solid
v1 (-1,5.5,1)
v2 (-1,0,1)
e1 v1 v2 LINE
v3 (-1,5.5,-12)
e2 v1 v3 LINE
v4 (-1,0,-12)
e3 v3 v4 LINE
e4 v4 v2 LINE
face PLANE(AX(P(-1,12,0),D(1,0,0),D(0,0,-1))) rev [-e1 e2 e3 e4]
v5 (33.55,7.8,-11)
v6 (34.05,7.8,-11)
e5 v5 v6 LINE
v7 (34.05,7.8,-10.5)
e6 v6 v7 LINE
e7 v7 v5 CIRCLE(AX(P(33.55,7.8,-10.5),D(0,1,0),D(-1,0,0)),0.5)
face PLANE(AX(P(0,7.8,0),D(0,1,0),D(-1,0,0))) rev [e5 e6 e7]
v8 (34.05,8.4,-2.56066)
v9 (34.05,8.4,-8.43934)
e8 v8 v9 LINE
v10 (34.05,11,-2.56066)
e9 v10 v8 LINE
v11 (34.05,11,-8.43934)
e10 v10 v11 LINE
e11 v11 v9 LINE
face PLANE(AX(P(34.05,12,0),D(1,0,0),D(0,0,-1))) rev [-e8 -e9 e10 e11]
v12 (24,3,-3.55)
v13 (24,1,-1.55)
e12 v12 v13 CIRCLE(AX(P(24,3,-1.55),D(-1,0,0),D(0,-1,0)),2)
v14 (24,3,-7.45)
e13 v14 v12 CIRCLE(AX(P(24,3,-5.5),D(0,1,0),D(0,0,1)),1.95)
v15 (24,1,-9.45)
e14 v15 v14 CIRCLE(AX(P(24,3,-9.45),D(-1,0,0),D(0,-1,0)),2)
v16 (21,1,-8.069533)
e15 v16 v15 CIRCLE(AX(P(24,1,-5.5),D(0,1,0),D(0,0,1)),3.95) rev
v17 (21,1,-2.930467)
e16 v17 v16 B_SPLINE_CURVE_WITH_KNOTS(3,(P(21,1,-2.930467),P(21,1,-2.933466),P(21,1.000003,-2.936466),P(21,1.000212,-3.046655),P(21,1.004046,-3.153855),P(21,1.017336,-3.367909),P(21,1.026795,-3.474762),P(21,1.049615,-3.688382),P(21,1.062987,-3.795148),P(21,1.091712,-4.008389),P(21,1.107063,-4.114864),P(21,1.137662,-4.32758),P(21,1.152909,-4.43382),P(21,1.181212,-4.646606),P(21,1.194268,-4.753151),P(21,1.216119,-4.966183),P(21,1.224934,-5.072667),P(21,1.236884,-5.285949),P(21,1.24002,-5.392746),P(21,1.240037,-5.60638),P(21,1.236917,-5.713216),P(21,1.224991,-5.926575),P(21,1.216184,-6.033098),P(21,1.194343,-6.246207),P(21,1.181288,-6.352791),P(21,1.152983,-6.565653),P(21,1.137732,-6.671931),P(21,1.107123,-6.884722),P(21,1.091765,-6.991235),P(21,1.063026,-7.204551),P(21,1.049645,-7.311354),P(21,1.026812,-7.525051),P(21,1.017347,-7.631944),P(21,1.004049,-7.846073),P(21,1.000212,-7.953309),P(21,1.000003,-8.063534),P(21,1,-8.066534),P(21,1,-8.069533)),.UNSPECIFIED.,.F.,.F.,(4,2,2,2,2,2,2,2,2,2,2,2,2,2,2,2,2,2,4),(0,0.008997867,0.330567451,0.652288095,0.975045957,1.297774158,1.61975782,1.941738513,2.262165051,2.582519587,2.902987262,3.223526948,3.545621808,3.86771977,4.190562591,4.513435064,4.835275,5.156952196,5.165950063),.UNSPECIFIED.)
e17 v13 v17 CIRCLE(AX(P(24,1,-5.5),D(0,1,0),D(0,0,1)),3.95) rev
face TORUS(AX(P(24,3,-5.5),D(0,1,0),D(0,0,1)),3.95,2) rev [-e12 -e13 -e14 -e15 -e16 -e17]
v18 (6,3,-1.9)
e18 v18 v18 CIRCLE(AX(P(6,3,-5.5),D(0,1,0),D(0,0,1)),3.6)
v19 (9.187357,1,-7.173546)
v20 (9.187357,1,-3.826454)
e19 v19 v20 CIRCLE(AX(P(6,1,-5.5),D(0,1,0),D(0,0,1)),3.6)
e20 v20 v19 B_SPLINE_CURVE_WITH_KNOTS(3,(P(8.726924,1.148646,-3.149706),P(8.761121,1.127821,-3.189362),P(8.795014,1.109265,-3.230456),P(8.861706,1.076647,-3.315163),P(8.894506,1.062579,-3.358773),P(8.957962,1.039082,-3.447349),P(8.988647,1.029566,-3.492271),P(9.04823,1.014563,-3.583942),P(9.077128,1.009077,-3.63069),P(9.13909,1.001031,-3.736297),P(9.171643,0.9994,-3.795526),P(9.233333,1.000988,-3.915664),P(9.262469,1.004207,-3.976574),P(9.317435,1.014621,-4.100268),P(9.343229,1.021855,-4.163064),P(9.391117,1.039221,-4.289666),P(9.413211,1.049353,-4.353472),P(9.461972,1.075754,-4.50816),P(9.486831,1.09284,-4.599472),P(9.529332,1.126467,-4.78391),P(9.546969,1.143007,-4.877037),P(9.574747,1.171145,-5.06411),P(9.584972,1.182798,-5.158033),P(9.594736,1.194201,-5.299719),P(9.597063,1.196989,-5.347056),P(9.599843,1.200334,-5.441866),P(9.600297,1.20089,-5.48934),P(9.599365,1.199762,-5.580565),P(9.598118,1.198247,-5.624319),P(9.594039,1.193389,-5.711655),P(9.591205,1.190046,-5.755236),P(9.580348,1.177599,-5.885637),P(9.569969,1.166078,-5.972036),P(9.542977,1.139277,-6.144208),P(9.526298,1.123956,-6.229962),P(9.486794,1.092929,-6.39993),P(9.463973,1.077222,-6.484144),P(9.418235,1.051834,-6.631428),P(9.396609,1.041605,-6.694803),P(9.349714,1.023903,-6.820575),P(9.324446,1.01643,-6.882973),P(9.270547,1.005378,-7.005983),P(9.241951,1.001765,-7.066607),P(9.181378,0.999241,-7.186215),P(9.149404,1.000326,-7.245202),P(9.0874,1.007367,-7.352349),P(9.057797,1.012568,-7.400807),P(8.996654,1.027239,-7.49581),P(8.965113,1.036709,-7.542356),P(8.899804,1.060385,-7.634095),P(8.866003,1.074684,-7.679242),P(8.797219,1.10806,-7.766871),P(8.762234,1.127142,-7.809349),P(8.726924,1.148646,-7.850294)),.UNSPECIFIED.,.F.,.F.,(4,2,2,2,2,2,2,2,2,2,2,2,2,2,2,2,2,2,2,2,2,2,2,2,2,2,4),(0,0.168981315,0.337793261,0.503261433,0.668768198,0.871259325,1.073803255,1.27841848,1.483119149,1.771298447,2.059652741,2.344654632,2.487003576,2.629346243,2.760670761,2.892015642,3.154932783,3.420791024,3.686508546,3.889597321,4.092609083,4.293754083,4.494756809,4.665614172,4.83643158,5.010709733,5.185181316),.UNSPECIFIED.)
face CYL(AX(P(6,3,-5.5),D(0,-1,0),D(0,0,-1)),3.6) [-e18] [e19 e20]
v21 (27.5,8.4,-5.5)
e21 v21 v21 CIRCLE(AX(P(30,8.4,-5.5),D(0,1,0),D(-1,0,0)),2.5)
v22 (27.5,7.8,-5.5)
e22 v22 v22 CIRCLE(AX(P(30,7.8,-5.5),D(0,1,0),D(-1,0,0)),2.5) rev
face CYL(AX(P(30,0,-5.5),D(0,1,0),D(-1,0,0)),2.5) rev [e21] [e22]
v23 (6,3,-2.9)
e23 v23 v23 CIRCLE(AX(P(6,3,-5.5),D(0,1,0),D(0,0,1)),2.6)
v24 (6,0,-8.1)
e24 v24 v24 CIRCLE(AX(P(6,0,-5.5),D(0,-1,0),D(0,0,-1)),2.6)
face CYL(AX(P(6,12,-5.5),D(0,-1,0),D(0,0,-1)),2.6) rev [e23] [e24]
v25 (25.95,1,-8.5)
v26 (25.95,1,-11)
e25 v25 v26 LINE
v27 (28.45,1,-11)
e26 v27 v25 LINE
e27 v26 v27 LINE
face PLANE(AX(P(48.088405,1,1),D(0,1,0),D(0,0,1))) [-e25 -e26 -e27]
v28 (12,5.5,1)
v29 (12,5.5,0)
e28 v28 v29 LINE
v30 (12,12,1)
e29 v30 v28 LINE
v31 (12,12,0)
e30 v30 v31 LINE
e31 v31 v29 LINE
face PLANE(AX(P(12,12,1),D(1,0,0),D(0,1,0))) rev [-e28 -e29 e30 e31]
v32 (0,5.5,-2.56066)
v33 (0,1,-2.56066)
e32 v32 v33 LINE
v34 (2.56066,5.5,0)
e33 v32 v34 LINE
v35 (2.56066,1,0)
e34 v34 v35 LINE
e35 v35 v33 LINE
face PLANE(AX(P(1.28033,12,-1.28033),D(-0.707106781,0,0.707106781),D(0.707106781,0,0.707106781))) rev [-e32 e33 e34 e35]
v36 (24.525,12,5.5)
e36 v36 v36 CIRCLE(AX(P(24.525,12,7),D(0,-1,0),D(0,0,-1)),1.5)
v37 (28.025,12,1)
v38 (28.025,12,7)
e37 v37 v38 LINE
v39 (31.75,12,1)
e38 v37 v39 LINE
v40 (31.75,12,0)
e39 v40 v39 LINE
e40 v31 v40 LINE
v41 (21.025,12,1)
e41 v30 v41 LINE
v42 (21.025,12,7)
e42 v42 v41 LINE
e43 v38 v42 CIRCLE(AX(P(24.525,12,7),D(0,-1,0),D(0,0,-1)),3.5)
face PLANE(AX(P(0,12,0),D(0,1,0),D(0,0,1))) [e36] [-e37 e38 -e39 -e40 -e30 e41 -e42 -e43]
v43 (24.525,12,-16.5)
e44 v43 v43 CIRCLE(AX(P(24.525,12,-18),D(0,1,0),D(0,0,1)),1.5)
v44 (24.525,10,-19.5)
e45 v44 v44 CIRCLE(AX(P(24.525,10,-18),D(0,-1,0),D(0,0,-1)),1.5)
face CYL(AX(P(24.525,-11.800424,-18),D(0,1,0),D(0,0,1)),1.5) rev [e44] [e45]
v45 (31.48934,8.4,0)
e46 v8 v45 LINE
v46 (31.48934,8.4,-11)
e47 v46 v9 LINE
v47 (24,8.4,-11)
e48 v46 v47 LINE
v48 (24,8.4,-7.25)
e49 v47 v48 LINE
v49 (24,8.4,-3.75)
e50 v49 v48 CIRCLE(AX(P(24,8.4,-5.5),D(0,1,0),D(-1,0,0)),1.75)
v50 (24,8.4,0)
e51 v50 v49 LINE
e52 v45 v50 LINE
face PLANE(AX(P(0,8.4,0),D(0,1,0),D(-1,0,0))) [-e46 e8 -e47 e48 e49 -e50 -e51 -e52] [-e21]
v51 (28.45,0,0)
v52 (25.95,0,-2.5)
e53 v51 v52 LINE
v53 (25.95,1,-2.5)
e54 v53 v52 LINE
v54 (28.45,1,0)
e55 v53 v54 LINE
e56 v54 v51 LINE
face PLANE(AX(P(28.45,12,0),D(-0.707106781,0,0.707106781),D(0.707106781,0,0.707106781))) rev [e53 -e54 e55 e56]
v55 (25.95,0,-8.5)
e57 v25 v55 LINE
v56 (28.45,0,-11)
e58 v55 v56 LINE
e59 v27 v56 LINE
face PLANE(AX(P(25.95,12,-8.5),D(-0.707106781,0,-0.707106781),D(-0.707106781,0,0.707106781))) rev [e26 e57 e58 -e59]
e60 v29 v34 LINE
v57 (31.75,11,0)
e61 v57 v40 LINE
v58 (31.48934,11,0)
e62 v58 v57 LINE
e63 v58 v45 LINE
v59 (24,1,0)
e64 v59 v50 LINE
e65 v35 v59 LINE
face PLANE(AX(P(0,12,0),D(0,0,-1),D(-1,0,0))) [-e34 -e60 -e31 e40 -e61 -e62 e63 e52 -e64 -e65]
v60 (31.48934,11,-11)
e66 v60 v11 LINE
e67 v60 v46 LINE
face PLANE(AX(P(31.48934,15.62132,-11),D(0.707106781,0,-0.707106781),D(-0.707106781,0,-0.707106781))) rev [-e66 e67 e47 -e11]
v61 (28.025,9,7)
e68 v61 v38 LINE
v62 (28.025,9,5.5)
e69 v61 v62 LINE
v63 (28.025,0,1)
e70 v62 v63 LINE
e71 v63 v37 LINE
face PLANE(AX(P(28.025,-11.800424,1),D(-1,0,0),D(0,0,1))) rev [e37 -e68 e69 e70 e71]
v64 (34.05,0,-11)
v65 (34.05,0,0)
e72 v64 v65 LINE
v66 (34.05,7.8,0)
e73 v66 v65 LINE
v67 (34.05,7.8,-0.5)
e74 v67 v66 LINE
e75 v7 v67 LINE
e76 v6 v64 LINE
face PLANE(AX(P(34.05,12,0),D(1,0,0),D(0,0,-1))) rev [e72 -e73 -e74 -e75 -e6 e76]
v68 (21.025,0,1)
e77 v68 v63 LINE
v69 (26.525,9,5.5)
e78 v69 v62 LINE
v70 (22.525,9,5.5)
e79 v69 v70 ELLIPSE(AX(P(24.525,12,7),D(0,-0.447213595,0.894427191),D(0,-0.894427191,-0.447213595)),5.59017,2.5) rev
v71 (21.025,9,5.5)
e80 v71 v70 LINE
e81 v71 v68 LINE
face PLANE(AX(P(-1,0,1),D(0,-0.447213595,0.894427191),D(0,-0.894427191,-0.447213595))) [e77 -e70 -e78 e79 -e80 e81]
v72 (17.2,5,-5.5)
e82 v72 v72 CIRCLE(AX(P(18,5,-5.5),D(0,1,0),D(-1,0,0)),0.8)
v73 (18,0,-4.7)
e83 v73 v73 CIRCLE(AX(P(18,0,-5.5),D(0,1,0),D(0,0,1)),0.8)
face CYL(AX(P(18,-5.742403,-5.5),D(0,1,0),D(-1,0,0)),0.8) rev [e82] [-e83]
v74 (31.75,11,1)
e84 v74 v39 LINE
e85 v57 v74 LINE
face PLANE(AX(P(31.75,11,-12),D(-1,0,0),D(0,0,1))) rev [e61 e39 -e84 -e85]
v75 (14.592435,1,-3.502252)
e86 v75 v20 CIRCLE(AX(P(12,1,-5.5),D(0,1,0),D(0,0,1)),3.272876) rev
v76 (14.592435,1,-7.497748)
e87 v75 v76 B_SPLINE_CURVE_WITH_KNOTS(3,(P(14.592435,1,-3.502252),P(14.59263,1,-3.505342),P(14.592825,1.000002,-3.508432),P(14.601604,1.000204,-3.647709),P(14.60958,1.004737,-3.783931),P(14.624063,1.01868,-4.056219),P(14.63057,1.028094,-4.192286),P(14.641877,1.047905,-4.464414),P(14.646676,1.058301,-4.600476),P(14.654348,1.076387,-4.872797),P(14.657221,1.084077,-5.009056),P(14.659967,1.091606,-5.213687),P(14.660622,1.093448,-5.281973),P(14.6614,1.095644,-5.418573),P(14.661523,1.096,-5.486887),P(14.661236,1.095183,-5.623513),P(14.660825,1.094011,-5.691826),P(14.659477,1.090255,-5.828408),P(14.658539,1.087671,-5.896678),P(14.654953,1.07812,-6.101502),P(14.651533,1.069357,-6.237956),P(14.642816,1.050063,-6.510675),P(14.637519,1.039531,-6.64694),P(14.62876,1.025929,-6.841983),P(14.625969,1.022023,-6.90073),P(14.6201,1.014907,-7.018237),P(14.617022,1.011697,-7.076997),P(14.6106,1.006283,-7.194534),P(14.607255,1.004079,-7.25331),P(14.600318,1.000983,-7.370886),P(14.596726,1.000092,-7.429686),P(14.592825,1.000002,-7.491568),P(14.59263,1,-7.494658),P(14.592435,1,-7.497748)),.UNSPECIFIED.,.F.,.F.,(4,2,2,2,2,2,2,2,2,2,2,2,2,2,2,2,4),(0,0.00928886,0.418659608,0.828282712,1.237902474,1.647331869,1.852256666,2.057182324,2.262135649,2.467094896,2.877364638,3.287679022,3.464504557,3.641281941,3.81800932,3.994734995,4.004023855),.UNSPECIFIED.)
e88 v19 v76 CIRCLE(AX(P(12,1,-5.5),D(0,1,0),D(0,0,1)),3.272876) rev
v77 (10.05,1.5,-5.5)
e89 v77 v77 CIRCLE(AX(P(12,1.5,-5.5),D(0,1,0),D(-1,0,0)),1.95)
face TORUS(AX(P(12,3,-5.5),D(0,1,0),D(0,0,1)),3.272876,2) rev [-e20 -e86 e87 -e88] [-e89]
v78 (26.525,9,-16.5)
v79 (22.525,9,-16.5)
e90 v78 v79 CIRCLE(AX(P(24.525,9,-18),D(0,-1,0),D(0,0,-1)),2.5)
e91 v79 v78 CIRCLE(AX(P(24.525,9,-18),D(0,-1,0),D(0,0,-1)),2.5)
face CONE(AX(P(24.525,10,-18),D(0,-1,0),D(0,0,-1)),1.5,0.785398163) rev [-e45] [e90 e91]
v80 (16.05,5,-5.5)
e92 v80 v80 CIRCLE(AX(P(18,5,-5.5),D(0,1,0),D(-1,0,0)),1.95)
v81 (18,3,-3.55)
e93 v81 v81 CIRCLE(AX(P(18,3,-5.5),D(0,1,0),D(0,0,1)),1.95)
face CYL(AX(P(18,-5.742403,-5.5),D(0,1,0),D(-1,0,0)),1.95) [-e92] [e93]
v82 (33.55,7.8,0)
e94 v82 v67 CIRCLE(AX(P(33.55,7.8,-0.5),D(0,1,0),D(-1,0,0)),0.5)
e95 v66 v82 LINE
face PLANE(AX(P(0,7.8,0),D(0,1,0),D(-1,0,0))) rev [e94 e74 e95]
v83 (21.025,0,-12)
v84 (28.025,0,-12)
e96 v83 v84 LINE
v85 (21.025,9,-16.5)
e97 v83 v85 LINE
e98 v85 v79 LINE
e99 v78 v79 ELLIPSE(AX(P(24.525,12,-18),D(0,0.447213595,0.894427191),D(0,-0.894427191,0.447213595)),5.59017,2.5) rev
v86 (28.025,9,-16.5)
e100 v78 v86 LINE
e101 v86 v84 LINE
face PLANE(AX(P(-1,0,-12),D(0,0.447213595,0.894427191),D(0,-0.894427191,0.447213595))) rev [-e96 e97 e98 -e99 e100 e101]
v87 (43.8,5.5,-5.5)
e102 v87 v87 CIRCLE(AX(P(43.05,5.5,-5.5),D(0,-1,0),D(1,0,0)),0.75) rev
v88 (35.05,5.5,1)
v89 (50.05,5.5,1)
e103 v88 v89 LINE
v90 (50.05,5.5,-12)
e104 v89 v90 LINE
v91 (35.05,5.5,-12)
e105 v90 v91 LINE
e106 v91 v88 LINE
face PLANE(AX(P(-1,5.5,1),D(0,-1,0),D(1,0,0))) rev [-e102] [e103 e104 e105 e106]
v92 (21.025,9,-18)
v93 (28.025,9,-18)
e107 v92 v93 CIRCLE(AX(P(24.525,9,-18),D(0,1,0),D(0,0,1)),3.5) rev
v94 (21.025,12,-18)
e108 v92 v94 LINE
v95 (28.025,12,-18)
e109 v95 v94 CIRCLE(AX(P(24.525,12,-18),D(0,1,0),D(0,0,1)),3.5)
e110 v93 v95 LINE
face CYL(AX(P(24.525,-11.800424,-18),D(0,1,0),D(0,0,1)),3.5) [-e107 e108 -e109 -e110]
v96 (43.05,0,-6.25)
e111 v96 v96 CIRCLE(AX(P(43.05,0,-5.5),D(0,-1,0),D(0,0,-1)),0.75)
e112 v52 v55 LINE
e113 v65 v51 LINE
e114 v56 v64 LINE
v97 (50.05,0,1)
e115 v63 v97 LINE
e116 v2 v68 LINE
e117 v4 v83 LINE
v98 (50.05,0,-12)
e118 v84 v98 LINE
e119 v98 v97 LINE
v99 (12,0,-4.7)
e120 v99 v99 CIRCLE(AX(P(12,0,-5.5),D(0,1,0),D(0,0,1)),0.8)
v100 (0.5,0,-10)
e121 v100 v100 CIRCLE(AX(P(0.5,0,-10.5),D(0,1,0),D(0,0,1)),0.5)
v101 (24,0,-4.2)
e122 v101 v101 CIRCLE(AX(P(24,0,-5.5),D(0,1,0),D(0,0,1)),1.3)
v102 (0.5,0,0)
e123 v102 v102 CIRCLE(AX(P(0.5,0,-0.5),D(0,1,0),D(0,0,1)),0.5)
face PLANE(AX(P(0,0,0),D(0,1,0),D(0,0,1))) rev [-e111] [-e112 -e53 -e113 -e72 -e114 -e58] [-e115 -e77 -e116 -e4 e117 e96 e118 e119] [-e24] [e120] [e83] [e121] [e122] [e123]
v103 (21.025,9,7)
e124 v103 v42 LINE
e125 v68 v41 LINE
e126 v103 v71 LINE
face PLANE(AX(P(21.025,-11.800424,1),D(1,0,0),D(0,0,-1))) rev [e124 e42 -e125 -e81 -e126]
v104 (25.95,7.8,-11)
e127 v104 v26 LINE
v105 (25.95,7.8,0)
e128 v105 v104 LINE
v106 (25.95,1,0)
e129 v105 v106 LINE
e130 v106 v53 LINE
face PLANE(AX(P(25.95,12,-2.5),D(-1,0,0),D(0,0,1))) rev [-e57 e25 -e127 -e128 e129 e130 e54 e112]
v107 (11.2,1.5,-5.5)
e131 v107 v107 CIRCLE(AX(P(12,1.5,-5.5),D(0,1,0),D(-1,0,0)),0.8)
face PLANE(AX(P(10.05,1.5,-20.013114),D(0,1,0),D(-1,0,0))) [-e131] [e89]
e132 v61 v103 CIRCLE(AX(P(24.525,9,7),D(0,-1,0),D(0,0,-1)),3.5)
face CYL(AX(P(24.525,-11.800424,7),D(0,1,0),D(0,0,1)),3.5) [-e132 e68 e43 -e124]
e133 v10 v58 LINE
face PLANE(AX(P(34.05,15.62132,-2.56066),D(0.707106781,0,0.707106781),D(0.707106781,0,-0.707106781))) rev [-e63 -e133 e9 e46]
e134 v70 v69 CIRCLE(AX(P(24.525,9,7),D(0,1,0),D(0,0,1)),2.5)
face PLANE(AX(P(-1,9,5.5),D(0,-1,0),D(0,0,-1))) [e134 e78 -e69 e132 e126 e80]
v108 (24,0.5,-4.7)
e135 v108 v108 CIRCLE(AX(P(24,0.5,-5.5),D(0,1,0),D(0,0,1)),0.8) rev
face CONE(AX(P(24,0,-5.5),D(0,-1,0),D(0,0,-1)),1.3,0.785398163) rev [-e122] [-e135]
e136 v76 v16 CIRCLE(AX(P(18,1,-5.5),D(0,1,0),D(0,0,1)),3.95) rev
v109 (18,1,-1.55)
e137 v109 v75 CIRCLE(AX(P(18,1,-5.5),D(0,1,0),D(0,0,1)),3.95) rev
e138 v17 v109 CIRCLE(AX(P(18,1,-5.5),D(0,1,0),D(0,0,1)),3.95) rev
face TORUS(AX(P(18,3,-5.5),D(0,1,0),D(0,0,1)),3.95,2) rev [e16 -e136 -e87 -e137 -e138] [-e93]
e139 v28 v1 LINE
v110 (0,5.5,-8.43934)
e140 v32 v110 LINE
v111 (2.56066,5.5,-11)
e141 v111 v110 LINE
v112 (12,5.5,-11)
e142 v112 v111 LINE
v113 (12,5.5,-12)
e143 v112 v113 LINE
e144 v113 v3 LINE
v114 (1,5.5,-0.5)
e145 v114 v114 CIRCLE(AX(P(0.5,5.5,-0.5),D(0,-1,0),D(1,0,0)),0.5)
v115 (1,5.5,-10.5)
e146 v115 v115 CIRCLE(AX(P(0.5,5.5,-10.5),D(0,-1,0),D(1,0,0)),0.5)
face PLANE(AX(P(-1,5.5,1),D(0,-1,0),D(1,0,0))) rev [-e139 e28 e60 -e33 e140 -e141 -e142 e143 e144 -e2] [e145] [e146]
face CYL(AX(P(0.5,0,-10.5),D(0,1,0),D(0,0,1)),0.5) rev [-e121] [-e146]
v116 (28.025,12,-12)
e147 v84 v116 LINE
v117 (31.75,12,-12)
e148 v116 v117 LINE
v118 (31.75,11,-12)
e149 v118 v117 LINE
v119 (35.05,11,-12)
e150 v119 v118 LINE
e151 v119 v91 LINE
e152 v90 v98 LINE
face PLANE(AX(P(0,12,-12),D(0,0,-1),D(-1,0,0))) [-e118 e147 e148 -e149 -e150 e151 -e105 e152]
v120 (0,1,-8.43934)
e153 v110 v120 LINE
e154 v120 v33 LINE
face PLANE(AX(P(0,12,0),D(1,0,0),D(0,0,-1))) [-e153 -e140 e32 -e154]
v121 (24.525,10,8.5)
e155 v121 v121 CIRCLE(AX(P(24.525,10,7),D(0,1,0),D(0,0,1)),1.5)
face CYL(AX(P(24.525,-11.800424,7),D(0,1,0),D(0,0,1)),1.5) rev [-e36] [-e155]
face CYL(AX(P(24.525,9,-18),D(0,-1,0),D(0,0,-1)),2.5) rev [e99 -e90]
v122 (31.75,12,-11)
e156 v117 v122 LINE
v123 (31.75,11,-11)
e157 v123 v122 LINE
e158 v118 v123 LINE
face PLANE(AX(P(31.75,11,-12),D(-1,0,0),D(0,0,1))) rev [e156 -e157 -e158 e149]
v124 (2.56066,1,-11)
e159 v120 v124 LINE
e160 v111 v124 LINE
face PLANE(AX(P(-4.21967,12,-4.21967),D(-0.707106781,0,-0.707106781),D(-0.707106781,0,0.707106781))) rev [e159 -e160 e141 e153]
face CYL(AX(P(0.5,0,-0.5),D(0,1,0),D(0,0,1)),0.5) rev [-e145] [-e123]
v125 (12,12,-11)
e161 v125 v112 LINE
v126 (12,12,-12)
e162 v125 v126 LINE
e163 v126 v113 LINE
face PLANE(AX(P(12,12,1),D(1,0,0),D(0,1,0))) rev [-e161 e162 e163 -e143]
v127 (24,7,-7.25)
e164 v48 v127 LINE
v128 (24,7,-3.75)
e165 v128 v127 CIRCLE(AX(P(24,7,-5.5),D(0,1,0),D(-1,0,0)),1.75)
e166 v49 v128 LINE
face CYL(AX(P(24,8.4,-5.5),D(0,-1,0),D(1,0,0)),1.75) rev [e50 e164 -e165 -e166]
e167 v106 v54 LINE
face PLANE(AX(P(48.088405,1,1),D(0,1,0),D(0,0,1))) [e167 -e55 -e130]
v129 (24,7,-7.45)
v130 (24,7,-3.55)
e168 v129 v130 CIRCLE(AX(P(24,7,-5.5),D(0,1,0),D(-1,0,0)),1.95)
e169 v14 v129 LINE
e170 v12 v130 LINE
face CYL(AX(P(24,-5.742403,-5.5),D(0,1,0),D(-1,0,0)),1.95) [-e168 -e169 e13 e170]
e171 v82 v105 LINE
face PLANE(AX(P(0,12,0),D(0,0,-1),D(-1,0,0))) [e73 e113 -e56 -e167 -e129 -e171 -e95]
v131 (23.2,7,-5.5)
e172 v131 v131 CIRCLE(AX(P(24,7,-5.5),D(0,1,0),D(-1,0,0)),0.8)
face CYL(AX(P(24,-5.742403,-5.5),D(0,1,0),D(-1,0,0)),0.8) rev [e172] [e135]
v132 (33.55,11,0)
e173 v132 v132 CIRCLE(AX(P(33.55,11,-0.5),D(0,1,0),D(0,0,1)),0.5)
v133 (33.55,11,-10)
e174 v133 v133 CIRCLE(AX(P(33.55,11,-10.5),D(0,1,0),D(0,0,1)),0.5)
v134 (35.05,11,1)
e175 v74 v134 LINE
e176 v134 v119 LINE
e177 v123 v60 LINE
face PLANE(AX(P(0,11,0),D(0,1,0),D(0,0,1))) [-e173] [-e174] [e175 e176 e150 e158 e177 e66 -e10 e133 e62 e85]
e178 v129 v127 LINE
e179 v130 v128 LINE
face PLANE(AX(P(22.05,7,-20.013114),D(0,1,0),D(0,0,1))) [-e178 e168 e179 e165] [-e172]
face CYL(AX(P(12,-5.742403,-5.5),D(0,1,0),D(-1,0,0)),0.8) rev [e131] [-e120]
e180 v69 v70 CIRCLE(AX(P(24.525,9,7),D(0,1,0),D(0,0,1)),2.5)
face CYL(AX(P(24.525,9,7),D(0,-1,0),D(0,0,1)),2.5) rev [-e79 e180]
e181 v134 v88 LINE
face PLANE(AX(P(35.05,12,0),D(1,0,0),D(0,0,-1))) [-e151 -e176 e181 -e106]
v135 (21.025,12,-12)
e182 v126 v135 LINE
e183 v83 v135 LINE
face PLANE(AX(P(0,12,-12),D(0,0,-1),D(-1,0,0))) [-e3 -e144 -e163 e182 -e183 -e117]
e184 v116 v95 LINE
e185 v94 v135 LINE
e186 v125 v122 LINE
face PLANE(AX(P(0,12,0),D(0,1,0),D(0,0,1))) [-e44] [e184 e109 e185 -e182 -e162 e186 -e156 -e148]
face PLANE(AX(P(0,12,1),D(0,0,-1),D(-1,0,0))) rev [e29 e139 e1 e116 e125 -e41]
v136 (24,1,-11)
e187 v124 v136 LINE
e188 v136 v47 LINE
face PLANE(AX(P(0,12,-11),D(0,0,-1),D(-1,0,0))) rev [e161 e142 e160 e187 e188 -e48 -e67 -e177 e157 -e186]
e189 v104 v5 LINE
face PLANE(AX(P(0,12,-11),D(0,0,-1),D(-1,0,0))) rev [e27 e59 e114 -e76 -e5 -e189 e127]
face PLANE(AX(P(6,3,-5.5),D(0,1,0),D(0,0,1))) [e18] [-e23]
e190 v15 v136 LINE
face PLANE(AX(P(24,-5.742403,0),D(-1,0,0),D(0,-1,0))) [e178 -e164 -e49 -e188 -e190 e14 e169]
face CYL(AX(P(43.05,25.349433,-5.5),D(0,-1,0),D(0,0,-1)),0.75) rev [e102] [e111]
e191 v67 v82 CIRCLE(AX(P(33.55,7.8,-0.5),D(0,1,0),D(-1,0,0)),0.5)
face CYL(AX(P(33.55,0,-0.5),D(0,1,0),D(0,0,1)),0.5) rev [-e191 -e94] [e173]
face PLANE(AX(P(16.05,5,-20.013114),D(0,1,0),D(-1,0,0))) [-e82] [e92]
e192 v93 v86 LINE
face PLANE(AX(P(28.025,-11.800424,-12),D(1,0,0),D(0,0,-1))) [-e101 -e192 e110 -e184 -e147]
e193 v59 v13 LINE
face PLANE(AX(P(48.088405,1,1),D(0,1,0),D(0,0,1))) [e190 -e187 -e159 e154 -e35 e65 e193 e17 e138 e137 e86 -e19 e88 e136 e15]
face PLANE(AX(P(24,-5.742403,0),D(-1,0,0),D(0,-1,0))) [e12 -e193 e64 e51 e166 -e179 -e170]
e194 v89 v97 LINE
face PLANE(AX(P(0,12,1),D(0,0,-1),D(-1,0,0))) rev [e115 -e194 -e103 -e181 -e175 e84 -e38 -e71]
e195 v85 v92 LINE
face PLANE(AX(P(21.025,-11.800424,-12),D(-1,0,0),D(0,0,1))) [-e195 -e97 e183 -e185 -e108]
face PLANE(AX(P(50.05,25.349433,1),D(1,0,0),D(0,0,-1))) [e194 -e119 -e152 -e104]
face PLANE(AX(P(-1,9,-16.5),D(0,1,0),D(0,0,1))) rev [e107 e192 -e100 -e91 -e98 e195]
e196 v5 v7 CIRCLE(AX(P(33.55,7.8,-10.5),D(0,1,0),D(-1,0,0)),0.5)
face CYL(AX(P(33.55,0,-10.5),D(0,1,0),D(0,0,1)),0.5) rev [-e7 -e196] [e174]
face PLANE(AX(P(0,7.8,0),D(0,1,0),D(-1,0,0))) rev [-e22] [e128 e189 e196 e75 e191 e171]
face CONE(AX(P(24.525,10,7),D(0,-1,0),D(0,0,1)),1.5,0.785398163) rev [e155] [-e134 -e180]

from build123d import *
from build123d.topology import SkipClean

# Parameters (mm, degrees)
ESQUISSE2_W                 = 36.05
ESQUISSE2_H                 = 13
ESQUISSE2_W_2               = 34.05
ESQUISSE2_H_2               = 11
BOSS_EXTRU_1_DEPTH          = 12
ESQUISSE3_W                 = 13
ESQUISSE3_H                 = 1
BOSS_EXTRU_2_DEPTH          = 36.05
ESQUISSE4_R                 = 2.6
ENL_V_MAT_EXTRU_1_DEPTH     = 12
ESQUISSE6_W                 = 3.9
ESQUISSE6_H                 = 1.5
ESQUISSE6_H_2               = 5
ESQUISSE6_H_3               = 7
BOSS_EXTRU_3_DEPTH          = 13
ENL_V_START                 = -6
ENL_V_MAT_EXTRU_2_OUTLINE_R = 0.8
ENL_V_MAT_EXTRU_2_DEPTH     = 6
ESQUISSE8_W                 = 13
ESQUISSE8_H                 = 6.5
ENL_V_MAT_EXTRU_3_DEPTH     = 40.261972696
ESQUISSE9_W                 = 8.1
ESQUISSE9_H                 = 11
BOSS_EXTRU_5_DEPTH          = 1.4
ESQUISSE11_R                = 2.5
ENL_V_MAT_EXTRU_4_DEPTH     = 38.987662471
CONG_2_R                    = 2
ESQUISSE10_W                = 8.1
ESQUISSE10_H                = 11
ENL_V_MAT_EXTRU_5_DEPTH     = 0.8
BOSS_EXTRU_6_DEPTH          = 2.6
ESQUISSE14_R                = 0.5
ENL_V_MAT_EXTRU_7_DEPTH     = 39.645860063
ESQUISSE15_R                = 0.8
ENL_V_MAT_EXTRU_8_DEPTH     = 38.702818197
ESQUISSE16_W                = 3.3
ESQUISSE16_H                = 13
ENL_V_MAT_EXTRU_9_DEPTH     = 1
CHANFREIN1_SIZE             = 0.5
ESQUISSE18_W                = 15
ESQUISSE18_H                = 13
ESQUISSE18_R                = 0.75
BOSS_EXTRU_9_DEPTH          = 5.5
ESQUISSE19_R                = 1.5
BOSS_EXTRU_10_DEPTH         = 12
ENL_V_MAT_EXTRU_10_DEPTH    = 39.061800076
ESQUISSE23_R                = 3.6
ESQUISSE23_R_2              = 2.6
BOSS_EXTRU_11_DEPTH         = 2


# Read off the part's stored shape, not the designer's step: Enlèv. mat.-Extru.2
with BuildPart() as part:
    # Esquisse2 → Boss.-Extru.1 (new body)
    # profile 1 of 3: a face of its own
    with BuildSketch(Plane(origin=(0, 0, 0), x_dir=(1, 0, 0), z_dir=(0, 1, 0))):
        with Locations((17.025, 5.5)):
            Rectangle(ESQUISSE2_W, ESQUISSE2_H)
        with Locations((17.025, 5.5)):
            Rectangle(ESQUISSE2_W_2, ESQUISSE2_H_2, mode=Mode.SUBTRACT)
    # profile 2 of 3: a face of its own
    with BuildSketch(Plane(origin=(0, 0, 0), x_dir=(1, 0, 0), z_dir=(0, 1, 0))):
        Polygon((0, 0), (2.560660172, 0), (0, 2.560660172), align=None)
    # profile 3 of 3: a face of its own
    with BuildSketch(Plane(origin=(0, 0, 0), x_dir=(1, 0, 0), z_dir=(0, 1, 0))):
        Polygon((0, 11), (0, 8.439339828), (2.560660172, 11), align=None)
    extrude(amount=BOSS_EXTRU_1_DEPTH)

    # Esquisse3 → Boss.-Extru.2 (add)
    with BuildSketch(Plane.ZY.offset(1)):
        with Locations((-5.5, 0.5)):
            Rectangle(ESQUISSE3_W, ESQUISSE3_H)
    extrude(amount=-BOSS_EXTRU_2_DEPTH)

    # Esquisse4 → Enlèv. mat.-Extru.1 (cut)
    with BuildSketch(Plane.XZ):
        with Locations(Location((6, -5.5, 0), (0, 0, 270))):
            Circle(ESQUISSE4_R)
        Polygon((34.05, 0), (28.45, 0), (25.95, -2.5), (25.95, -8.5), (28.45, -11), (34.05, -11), align=None)
    extrude(amount=-ENL_V_MAT_EXTRU_1_DEPTH, mode=Mode.SUBTRACT)

    # Esquisse6 → Boss.-Extru.3 (add)
    with BuildSketch(Plane.XY.offset(1)):
        with Locations((12, 0.75)):
            Rectangle(ESQUISSE6_W, ESQUISSE6_H)
        with Locations((18, 2.5)):
            Rectangle(ESQUISSE6_W, ESQUISSE6_H_2)
        with Locations((24, 3.5)):
            Rectangle(ESQUISSE6_W, ESQUISSE6_H_3)
    extrude(amount=-BOSS_EXTRU_3_DEPTH)

    # Enlèv. mat.-Extru.2 outline → Enlèv. mat.-Extru.2 (cut)
    with BuildSketch(Plane(origin=(0, 7, 0), x_dir=(1, 0, 0), z_dir=(0, 1, 0)).offset(ENL_V_START)):
        with BuildLine():
            Line((24, 7.45), (24, 11))
            Line((24, 11), (22.05, 11))
            Line((22.05, 11), (22.05, 5.5))
            ThreePointArc((22.05, 5.5), (22.621141777, 6.878858223), (24, 7.45))
        make_face()
        with BuildLine():
            Line((19.95, 5.5), (19.95, 11))
            Line((19.95, 11), (16.05, 11))
            Line((16.05, 11), (16.05, 5.5))
            ThreePointArc((16.05, 5.5), (18, 7.45), (19.95, 5.5))
        make_face()
        with BuildLine():
            ThreePointArc((24, 3.55), (22.621141777, 4.121141777), (22.05, 5.5))
            Line((22.05, 5.5), (22.05, 0))
            Line((22.05, 0), (24, 0))
            Line((24, 0), (24, 3.55))
        make_face()
        with BuildLine():
            Line((19.95, 0), (19.95, 5.5))
            ThreePointArc((19.95, 5.5), (18, 3.55), (16.05, 5.5))
            Line((16.05, 5.5), (16.05, 0))
            Line((16.05, 0), (19.95, 0))
        make_face()
        with BuildLine():
            Line((13.95, 5.5), (13.95, 11))
            Line((13.95, 11), (10.05, 11))
            Line((10.05, 11), (10.05, 5.5))
            ThreePointArc((10.05, 5.5), (12, 7.45), (13.95, 5.5))
        make_face()
        with BuildLine():
            Line((13.95, 0), (13.95, 5.5))
            ThreePointArc((13.95, 5.5), (12, 3.55), (10.05, 5.5))
            Line((10.05, 5.5), (10.05, 0))
            Line((10.05, 0), (13.95, 0))
        make_face()
        with Locations((24, 5.5)):
            Circle(ENL_V_MAT_EXTRU_2_OUTLINE_R)
        with Locations((18, 5.5)):
            Circle(ENL_V_MAT_EXTRU_2_OUTLINE_R)
        with Locations((12, 5.5)):
            Circle(ENL_V_MAT_EXTRU_2_OUTLINE_R)
    extrude(amount=ENL_V_MAT_EXTRU_2_DEPTH, mode=Mode.SUBTRACT)

    # Esquisse8 → Enlèv. mat.-Extru.3 (cut, through all)
    with BuildSketch(Plane(origin=(0, 0, -12), x_dir=(-1, 0, 0), z_dir=(0, 0, -1))):
        with Locations((-5.5, 8.75)):
            Rectangle(ESQUISSE8_W, ESQUISSE8_H)
    extrude(amount=-ENL_V_MAT_EXTRU_3_DEPTH, mode=Mode.SUBTRACT)

    # Esquisse9 → Boss.-Extru.5 (add)
    with BuildSketch(Plane(origin=(0, 7, 0), x_dir=(1, 0, 0), z_dir=(0, 1, 0))):
        with Locations((30, 5.5)):
            Rectangle(ESQUISSE9_W, ESQUISSE9_H)
        with BuildLine():
            Line((24, 0), (25.95, 0))
            Line((25.95, 0), (25.95, 11))
            Line((25.95, 11), (24, 11))
            Line((24, 11), (24, 7.45))
            Line((24, 7.45), (24, 7.25))
            ThreePointArc((24, 7.25), (25.237436867, 6.737436867), (25.75, 5.5))
            ThreePointArc((25.75, 5.5), (25.237436867, 4.262563133), (24, 3.75))
            Line((24, 3.75), (24, 3.55))
            Line((24, 3.55), (24, 0))
        make_face()
    extrude(amount=BOSS_EXTRU_5_DEPTH)

    # Esquisse11 → Enlèv. mat.-Extru.4 (cut, through all)
    with BuildSketch(Plane(origin=(0, 8.4, 0), x_dir=(1, 0, 0), z_dir=(0, 1, 0))):
        with Locations(Location((30, 5.5, 0), (0, 0, 180))):
            Circle(ESQUISSE11_R)
    extrude(amount=-ENL_V_MAT_EXTRU_4_DEPTH, mode=Mode.SUBTRACT)

    # Congé2
    # the kernel refuses this fillet: 2 mm, written as the material it adds along each edge
    with BuildSketch(Plane(origin=(12, 1, -5.5), x_dir=(-1, 0, 0), z_dir=(0, 0, 1))) as cong_2_piece_1:
        with BuildLine():
            CenterArc((3.272875656, -2), CONG_2_R, 90, 41.409622109)
            Line((1.95, -0.5), (1.95, 0))
            Line((1.95, 0), (3.272875656, 0))
        make_face()
    revolve(axis=Axis((12, 1, -5.5), (0, -1, 0)))
    with BuildSketch(Plane(origin=(18, 1, -5.5), x_dir=(-1, 0, 0), z_dir=(0, 0, 1))) as cong_2_piece_2:
        with BuildLine():
            CenterArc((1.95 + CONG_2_R, -CONG_2_R), CONG_2_R, 90, 90)
            Line((1.95, -CONG_2_R), (1.95, 0))
            Line((1.95, 0), (1.95 + CONG_2_R, 0))
        make_face()
    revolve(axis=Axis((18, 1, -5.5), (0, -1, 0)))
    with BuildSketch(Plane(origin=(24.000000001, 1, -5.500000001), x_dir=(-5.493679582300461e-10, 0, 1.0), z_dir=(1.0, 0, 5.493679582300461e-10))) as cong_2_piece_3:
        with BuildLine():
            CenterArc((1.950000001 + CONG_2_R, -CONG_2_R), CONG_2_R, 90, 90)
            Line((1.950000001, -CONG_2_R), (1.950000001, 0))
            Line((1.950000001, 0), (1.950000001 + CONG_2_R, 0))
        make_face()
    revolve(axis=Axis((24.000000001, 1, -5.500000001), (0, -1, 0)), revolution_arc=89.999999937)
    with BuildSketch(Plane(origin=(24.000000001, 1, -5.499999999), x_dir=(-1.0, 0, -5.49367047277821e-10), z_dir=(-5.49367047277821e-10, 0, 1.0))) as cong_2_piece_4:
        with BuildLine():
            CenterArc((1.950000001 + CONG_2_R, -CONG_2_R), CONG_2_R, 90, 90)
            Line((1.950000001, -CONG_2_R), (1.950000001, 0))
            Line((1.950000001, 0), (1.950000001 + CONG_2_R, 0))
        make_face()
    revolve(axis=Axis((24.000000001, 1, -5.499999999), (0, -1, 0)), revolution_arc=89.999999937)

    # Esquisse10 → Enlèv. mat.-Extru.5 (cut)
    with BuildSketch(Plane.XZ.offset(-7)):
        with Locations((30, -5.5)):
            Rectangle(ESQUISSE10_W, ESQUISSE10_H)
    extrude(amount=-ENL_V_MAT_EXTRU_5_DEPTH, mode=Mode.SUBTRACT)

    # Esquisse13 → Boss.-Extru.6 (add)
    with BuildSketch(Plane(origin=(0, 8.4, 0), x_dir=(1, 0, 0), z_dir=(0, 1, 0))):
        Polygon((34.05, 2.560660172), (31.489339828, 0), (34.05, 0), align=None)
        Polygon((31.489339828, 11), (34.05, 8.439339828), (34.05, 11), align=None)
    extrude(amount=BOSS_EXTRU_6_DEPTH)

    # Esquisse14 → Enlèv. mat.-Extru.7 (cut, through all)
    with BuildSketch(Plane(origin=(0, 11, 0), x_dir=(1, 0, 0), z_dir=(0, 1, 0))):
        with Locations(Location((33.55, 0.5, 0), (0, 0, 270))):
            Circle(ESQUISSE14_R)
        with Locations((33.55, 10.5)):
            Circle(ESQUISSE14_R)
        with Locations(Location((0.5, 0.5, 0), (0, 0, 270))):
            Circle(ESQUISSE14_R)
        with Locations(Location((0.5, 10.5, 0), (0, 0, 270))):
            Circle(ESQUISSE14_R)
    extrude(amount=-ENL_V_MAT_EXTRU_7_DEPTH, mode=Mode.SUBTRACT)

    # Esquisse15 → Enlèv. mat.-Extru.8 (cut, through all)
    with SkipClean():  # the faces are left unmerged after this step: merging them gives an invalid solid
        with BuildSketch(Plane(origin=(0, 7, 0), x_dir=(1, 0, 0), z_dir=(0, 1, 0))):
            with Locations(Location((24, 5.5, 0), (0, 0, 180))):
                Circle(ESQUISSE15_R)
            with Locations(Location((18, 5.5, 0), (0, 0, 180))):
                Circle(ESQUISSE15_R)
            with Locations(Location((12, 5.5, 0), (0, 0, 180))):
                Circle(ESQUISSE15_R)
        extrude(amount=-ENL_V_MAT_EXTRU_8_DEPTH, mode=Mode.SUBTRACT)
    add(part.part.scale(1), mode=Mode.REPLACE)  # the faces are merged on a copy

    # Esquisse16 → Enlèv. mat.-Extru.9 (cut)
    with BuildSketch(Plane(origin=(0, 12, 0), x_dir=(1, 0, 0), z_dir=(0, 1, 0))):
        with Locations((33.4, 5.5)):
            Rectangle(ESQUISSE16_W, ESQUISSE16_H)
    extrude(amount=-ENL_V_MAT_EXTRU_9_DEPTH, mode=Mode.SUBTRACT)

    # Chanfrein1
    chanfrein1_edges = [part.edges().sort_by_distance(p)[0] for p in [
        (24.8, 0, -5.5),
    ]]
    chamfer(chanfrein1_edges, length=CHANFREIN1_SIZE)

    # Esquisse18 → Boss.-Extru.9 (add)
    with BuildSketch(Plane.XZ):
        with Locations((42.55, -5.5)):
            Rectangle(ESQUISSE18_W, ESQUISSE18_H)
        with Locations(Location((43.05, -5.5, 0), (0, 0, 270))):
            Circle(ESQUISSE18_R, mode=Mode.SUBTRACT)
    extrude(amount=-BOSS_EXTRU_9_DEPTH)

    # Esquisse19 → Boss.-Extru.10 (add)
    with BuildSketch(Plane(origin=(0, 12, 0), x_dir=(1, 0, 0), z_dir=(0, 1, 0))):
        with BuildLine():
            Line((28.025, 12), (21.025, 12))
            Line((21.025, 12), (21.025, 18))
            ThreePointArc((21.025, 18), (24.525, 21.5), (28.025, 18))
            Line((28.025, 18), (28.025, 12))
        make_face()
        with Locations(Location((24.525, 18, 0), (0, 0, 270))):
            Circle(ESQUISSE19_R, mode=Mode.SUBTRACT)
    boss_extru_10 = extrude(amount=-BOSS_EXTRU_10_DEPTH)

    # Esquisse21 → Enlèv. mat.-Extru.10 (cut, through all)
    with BuildSketch(Plane(origin=(28.025, 0, 0), x_dir=(0, 0, -1), z_dir=(1, 0, 0))):
        Polygon((12, 0), (16.5, 9), (21.5, 9), (21.5, 0), (16.5, 0), align=None)
    enl_v_mat_extru_10 = extrude(amount=-ENL_V_MAT_EXTRU_10_DEPTH, mode=Mode.SUBTRACT)

    # Esquisse22 → Enlèvement de matière-Révolution1 (revolve, cut)
    with BuildSketch(Plane(origin=(24.525, 0, 0), x_dir=(0, 0, -1), z_dir=(1, 0, 0))):
        Polygon((15.5, 7), (15.5, 9), (16.5, 10), (16.5, 9), (16.5, 7), align=None)
    enl_vement_de_mati_re_r_volution1 = revolve(axis=Axis((24.525, 9, -18), (0, 1, 0)), mode=Mode.SUBTRACT)

    # Symétrie1: Boss.-Extru.10, Enlèv. mat.-Extru.10, Enlèvement de matière-Révolution1 across plane
    add(boss_extru_10.mirror(Plane.XY.offset(-5.5)))
    add(enl_v_mat_extru_10.mirror(Plane.XY.offset(-5.5)), mode=Mode.SUBTRACT)
    add(enl_vement_de_mati_re_r_volution1.mirror(Plane.XY.offset(-5.5)), mode=Mode.SUBTRACT)

    # Esquisse23 → Boss.-Extru.11 (add)
    with BuildSketch(Plane(origin=(0, 1, 0), x_dir=(1, 0, 0), z_dir=(0, 1, 0))):
        with Locations(Location((6, 5.5, 0), (0, 0, 27.702053352))):
            Circle(ESQUISSE23_R)
        with Locations(Location((6, 5.5, 0), (0, 0, 90))):
            Circle(ESQUISSE23_R_2, mode=Mode.SUBTRACT)
    extrude(amount=BOSS_EXTRU_11_DEPTH)


solid = part.part
